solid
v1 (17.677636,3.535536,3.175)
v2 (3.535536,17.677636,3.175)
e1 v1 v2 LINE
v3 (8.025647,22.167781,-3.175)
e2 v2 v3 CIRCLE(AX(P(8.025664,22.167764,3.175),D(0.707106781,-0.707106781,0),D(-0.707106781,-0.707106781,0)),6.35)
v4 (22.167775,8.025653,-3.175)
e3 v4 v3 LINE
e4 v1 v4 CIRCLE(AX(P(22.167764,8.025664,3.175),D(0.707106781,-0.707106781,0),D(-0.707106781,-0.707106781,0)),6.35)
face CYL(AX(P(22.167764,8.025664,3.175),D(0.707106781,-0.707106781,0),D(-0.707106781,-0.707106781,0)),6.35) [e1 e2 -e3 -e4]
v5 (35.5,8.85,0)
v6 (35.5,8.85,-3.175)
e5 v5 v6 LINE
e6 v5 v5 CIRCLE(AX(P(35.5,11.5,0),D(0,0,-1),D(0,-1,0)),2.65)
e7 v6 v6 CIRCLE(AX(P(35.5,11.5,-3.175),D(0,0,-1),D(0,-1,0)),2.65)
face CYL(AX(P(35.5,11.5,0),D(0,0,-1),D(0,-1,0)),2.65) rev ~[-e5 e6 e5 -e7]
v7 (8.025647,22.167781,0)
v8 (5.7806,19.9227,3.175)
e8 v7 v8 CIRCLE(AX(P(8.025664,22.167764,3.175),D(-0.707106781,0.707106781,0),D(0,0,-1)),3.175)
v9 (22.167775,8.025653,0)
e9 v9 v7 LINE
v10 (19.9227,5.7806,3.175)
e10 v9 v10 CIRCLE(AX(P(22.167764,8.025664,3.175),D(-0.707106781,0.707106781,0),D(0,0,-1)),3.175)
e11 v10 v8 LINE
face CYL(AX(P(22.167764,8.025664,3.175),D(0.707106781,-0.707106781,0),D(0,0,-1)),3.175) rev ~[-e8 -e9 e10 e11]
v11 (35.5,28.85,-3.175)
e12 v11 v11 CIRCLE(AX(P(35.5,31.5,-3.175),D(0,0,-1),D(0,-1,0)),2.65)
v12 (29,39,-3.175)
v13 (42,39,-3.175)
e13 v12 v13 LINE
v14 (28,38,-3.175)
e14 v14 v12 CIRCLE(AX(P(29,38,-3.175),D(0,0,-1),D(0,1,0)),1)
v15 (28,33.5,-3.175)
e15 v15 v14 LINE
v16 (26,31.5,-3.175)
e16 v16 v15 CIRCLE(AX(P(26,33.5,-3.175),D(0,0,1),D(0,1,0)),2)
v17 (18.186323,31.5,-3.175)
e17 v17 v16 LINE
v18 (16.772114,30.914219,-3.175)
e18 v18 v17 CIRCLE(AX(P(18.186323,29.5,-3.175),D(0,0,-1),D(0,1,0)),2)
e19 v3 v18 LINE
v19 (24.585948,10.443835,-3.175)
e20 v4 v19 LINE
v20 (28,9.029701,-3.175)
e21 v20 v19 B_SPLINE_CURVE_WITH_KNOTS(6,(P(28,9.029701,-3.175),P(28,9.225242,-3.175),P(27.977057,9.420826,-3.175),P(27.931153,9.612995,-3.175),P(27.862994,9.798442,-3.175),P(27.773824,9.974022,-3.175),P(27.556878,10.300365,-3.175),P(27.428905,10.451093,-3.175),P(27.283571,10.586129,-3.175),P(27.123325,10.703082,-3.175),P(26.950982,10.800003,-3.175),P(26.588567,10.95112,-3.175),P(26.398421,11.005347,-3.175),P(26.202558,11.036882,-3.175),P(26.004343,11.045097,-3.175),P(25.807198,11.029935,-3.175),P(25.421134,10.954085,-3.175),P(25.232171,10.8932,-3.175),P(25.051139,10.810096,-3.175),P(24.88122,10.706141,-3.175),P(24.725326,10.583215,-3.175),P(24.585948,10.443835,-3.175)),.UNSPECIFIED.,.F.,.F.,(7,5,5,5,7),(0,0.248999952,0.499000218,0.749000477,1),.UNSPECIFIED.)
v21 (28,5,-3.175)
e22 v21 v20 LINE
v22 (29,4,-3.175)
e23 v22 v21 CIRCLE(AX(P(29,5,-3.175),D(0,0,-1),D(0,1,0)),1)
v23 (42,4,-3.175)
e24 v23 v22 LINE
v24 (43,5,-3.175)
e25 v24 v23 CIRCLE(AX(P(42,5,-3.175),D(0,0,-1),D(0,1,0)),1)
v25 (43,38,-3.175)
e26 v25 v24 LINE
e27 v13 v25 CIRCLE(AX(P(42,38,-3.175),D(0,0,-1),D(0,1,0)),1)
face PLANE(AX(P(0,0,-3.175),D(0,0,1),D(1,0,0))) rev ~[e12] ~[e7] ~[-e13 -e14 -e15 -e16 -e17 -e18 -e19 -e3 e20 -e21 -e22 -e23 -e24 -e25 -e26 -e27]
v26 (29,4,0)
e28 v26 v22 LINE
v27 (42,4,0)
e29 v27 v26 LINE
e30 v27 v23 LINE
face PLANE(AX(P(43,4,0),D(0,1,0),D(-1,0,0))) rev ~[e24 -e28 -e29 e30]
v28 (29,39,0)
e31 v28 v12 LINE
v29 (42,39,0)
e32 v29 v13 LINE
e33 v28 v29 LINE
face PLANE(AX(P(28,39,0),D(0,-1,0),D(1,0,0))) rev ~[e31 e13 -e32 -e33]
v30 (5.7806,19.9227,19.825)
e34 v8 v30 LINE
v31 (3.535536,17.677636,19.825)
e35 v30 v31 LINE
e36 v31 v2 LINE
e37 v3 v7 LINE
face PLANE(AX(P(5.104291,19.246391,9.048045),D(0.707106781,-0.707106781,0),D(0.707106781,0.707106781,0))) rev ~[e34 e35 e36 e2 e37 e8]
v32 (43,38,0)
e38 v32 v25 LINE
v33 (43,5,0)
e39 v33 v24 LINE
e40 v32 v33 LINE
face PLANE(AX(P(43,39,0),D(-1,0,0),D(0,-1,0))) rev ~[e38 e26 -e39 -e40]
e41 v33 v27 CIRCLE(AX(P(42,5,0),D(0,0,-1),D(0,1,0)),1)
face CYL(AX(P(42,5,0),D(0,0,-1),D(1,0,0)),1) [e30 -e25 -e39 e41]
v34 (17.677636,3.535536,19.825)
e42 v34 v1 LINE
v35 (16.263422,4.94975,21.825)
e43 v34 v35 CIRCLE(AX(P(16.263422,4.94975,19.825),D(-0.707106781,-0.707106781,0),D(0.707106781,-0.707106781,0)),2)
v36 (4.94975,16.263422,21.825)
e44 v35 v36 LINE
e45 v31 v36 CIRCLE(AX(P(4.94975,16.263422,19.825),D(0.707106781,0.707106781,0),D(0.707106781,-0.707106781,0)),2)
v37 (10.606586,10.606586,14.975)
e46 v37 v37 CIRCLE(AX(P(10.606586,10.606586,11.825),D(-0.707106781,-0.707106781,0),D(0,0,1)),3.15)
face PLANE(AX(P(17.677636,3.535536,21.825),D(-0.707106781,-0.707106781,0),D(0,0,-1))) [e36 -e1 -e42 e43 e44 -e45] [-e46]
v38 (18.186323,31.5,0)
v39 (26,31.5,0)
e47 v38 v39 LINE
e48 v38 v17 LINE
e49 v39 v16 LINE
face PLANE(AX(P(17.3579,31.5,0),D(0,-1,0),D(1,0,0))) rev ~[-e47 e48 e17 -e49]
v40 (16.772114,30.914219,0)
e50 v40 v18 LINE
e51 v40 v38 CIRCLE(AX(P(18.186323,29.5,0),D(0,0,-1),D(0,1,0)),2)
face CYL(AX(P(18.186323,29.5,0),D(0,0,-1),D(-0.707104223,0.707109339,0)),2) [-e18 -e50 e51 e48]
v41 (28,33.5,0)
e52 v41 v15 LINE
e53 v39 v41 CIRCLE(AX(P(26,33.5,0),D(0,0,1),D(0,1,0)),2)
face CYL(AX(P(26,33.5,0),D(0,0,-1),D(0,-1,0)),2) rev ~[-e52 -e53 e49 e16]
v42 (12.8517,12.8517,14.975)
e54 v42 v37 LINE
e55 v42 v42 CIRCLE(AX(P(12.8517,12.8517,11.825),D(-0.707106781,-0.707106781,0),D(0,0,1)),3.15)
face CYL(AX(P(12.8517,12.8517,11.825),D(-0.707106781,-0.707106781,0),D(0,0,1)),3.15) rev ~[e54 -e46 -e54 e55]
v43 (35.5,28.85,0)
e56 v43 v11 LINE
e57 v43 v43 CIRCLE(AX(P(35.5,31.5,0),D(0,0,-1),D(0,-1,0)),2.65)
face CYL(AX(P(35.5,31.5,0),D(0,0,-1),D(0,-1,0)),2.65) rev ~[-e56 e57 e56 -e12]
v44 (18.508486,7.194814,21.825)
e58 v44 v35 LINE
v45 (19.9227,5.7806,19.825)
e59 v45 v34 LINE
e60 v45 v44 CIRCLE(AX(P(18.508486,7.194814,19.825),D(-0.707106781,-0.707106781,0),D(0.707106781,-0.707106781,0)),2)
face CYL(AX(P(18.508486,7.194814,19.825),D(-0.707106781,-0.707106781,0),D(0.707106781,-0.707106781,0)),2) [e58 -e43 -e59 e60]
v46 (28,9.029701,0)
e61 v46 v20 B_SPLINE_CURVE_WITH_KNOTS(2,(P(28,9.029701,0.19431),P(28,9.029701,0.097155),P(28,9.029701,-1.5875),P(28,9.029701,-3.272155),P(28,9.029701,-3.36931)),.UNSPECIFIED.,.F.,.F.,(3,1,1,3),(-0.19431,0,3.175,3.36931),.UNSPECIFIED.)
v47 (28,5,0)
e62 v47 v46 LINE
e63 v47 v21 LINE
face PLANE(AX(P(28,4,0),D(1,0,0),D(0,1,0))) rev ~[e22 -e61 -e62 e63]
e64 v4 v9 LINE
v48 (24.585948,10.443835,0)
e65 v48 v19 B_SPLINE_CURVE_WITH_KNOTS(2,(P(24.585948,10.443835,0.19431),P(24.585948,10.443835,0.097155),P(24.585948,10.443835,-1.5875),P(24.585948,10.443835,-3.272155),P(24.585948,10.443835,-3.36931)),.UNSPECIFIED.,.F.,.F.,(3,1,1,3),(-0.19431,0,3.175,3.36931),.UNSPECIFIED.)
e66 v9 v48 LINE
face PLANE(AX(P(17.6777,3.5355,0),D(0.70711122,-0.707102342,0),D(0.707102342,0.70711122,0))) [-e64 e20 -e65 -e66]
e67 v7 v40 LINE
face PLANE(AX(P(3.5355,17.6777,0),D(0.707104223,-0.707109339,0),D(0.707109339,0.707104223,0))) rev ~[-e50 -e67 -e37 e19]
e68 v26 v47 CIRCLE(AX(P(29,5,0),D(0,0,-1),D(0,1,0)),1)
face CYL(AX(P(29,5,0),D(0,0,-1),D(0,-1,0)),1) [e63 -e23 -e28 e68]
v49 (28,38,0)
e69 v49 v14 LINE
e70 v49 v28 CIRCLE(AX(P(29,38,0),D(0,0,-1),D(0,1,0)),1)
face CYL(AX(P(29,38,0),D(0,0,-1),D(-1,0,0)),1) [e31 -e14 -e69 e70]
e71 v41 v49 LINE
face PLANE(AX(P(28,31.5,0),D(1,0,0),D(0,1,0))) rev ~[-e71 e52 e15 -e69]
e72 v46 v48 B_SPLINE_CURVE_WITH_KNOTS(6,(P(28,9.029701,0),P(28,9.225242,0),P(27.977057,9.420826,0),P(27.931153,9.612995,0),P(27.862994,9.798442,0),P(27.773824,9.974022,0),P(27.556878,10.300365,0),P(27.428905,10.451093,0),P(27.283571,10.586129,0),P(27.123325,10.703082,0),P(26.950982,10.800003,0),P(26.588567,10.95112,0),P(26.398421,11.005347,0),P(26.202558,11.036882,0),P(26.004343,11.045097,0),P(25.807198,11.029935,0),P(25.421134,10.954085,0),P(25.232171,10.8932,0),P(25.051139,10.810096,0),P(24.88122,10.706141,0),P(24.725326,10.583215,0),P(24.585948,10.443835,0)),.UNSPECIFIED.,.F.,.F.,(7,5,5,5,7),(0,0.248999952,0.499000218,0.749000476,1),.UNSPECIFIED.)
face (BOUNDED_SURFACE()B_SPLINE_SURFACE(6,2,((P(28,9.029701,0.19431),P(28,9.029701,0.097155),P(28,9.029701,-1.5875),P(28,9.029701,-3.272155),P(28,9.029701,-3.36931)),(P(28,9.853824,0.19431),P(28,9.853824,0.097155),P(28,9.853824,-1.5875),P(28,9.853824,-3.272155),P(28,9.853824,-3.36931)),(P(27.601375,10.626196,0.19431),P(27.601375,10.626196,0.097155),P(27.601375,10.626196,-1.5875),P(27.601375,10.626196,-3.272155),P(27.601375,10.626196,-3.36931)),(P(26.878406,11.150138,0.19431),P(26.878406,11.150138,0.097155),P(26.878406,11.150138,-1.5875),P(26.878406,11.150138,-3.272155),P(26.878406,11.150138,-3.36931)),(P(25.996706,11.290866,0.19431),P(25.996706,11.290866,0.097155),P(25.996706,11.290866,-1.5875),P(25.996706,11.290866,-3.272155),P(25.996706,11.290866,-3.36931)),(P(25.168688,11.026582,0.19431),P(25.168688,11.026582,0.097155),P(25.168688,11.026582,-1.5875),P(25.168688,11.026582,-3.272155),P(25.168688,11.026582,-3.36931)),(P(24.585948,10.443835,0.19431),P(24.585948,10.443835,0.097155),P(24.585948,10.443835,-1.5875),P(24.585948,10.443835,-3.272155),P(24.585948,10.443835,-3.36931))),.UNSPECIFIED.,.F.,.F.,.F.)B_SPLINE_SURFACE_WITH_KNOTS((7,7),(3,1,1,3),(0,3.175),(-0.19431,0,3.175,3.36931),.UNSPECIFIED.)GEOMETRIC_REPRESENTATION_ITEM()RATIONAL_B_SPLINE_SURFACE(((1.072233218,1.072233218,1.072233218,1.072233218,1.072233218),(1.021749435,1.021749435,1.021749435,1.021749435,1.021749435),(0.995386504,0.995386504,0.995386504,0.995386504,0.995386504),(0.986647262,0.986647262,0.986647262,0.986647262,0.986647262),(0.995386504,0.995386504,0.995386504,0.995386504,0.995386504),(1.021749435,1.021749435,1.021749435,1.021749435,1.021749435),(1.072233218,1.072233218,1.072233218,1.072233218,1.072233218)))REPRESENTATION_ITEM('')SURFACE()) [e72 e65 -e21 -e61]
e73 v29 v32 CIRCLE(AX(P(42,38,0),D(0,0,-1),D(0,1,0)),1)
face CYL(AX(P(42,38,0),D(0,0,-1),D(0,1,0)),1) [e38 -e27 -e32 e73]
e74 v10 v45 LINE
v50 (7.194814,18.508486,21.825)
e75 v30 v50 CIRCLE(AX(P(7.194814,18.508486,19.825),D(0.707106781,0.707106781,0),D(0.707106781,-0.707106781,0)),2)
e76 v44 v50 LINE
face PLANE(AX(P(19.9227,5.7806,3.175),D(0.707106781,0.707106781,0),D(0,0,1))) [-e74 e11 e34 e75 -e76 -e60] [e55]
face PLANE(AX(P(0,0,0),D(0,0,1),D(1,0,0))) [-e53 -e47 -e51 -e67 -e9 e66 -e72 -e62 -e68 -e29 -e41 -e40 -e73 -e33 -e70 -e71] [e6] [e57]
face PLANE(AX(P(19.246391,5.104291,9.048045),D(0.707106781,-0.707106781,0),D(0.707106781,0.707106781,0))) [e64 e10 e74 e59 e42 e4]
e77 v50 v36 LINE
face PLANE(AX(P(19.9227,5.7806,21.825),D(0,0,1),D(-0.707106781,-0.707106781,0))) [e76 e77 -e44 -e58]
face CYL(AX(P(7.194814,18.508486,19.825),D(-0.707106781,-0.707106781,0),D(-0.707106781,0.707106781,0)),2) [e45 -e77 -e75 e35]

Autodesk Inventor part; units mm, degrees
ref_plane "YZ Plane" through (0, 0, 0) normal (1, 0, 0) x (0, 1, 0)
ref_plane "XZ Plane" through (0, 0, 0) normal (0, 1, 0) x (-1, 0, 0)
ref_plane "XY Plane" through (0, 0, 0) normal (0, 0, 1) x (1, 0, 0)
sketch "Sketch1" plane through (0, 0, 0) normal (0, 0, 1) x (1, 0, 0)
  line L0 (0, -21.2132) -> (-21.2132, 0) construction
  line L1 (-21.2132, 0) -> (0, 21.2132) construction
  line L2 (0, 21.2132) -> (21.2132, 0) construction
  line L3 (21.2132, 0) -> (0, -21.2132) construction
  line L4 (0, -21.2132) -> (0, 21.2132) construction
  line L5 (-21.2132, 0) -> (21.2132, 0) construction
  line L6 (43, 4) -> (28, 4)
  line L7 (28, 4) -> (28, 39)
  line L8 (28, 39) -> (43, 39)
  line L9 (43, 39) -> (43, 4)
  line L10 (43, 4) -> (28, 39) construction
  line L11 (28, 4) -> (43, 39) construction
  line L12 (35.5, 11.5) -> (35.5, 31.5) construction
  line L13 (17.6777, 3.5355) -> (3.5355, 17.6777)
  line L14 (3.5355, 17.6777) -> (17.3579, 31.5)
  line L15 (17.3579, 31.5) -> (28, 31.5)
  line L16 (17.6777, 3.5355) -> (25.6421, 11.5)
  line L17 (25.6421, 11.5) -> (28, 11.5)
  line L18 (28, 11.5) -> (28, 31.5)
  point P0 (0, 0)
  point P1 (35.5, 21.5)
  point P2 (0, 0)
  point P3 (0, 0)
  point P4 (35.5, 21.5)
  point P5 (43, 21.5)
  point P6 (10.6066, 10.6066)
  point P7 (28, 21.5)
  dimension "d0" = 30
  dimension "d1" = 28
  dimension "d2" = 21.5
  dimension "d3" = 35
  dimension "d5" = 20
  dimension "d6" = 7.5
  dimension "d7" = 7.5
  dimension "d8" = 7.5
  dimension "d11" = 20
  dimension "d12" = 20
extrude "Plate2" add sketch "Sketch1" against normal blind 3.175
sketch "Sketch2" plane through (5.7806, 19.9227, -3.175) normal (-0.7071068, -0.7071068, 0) x (0.7071068, -0.7071068, 0)
  line L0 (20, 0) -> (0, 0)
  line L1 (0, 0) -> (0, -25)
  line L2 (0, -25) -> (20, -25)
  line L3 (20, -25) -> (20, 0)
edge flange "Flange1" height 25 angle 90 thickness 3.175 bend radius 3.175 thickness toward (-0.7071068, -0.7071068, 0) relief tear relief width 3.175 relief depth 1.5875 edges at (10.6066, 10.6066, -3.175) wall of the first edge with corners at (19.9227, 5.7806, -3.175) (5.7806, 19.9227, -3.175) (5.7806, 19.9227, 21.825) (19.9227, 5.7806, 21.825)
bend "Bend1"
corner "Corner1"
fillet "Fillet1" radius 2 4 edges at (25.6421, 11.5, -1.5875) (28, 11.5, -1.5875) (28, 31.5, -1.5875) (17.3579, 31.5, -1.5875)
sketch "Sketch3" plane through (5.7806, 19.9227, 3.175) normal (0.7071068, 0.7071068, 0) x (-0.7071068, 0.7071068, 0)
  line L0 (0, -1.35) -> (-20, -1.35) construction
  line L1 (-20, -1.35) -> (-20, 18.65) construction
  line L2 (-20, 18.65) -> (0, 18.65) construction
  line L3 (0, 18.65) -> (0, -1.35) construction
  line L4 (0, -1.35) -> (-20, 18.65) construction
  line L5 (-20, -1.35) -> (0, 18.65) construction
  point P0 (-10, -3.175)
  point P1 (-10, 8.65)
  point P2 (-20, 18.65)
  point P3 (0, 18.65)
hole "Hole2" at (12.8517, 12.8517, 11.825) direction (-0.7071068, -0.7071068, 0) diameter 6.3 end through all
fillet "Fillet2" radius 2 2 edges at (4.6581, 18.8002, 21.825) (18.8002, 4.6581, 21.825)
fillet "Fillet3" radius 1 4 edges at (28, 4, -1.5875) (28, 39, -1.5875) (43, 4, -1.5875) (43, 39, -1.5875)
hole "Hole1" at (35.5, 31.5, 0) at (35.5, 11.5, 0) direction (0, 0, -1) diameter 5.3 end through all
equation "\"d6\" = d7"
equation "\"d8\" = d6"
equation "\"d12\" = d11"
equation "\"d32\" = Thickness"
equation "\"d13\" = Thickness"
equation "\"d14\" = BendReliefWidth"
equation "\"d15\" = BendReliefDepth"
equation "\"d16\" = MinimumRemnant"
equation "\"d17\" = TransitionRadius"
equation "\"d20\" = BendRadius"
equation "\"d21\" = CornerReliefSize"
equation "\"d22\" = GapSize"
equation "\"d23\" = JacobiRadiusSize"
equation "\"BendReliefWidth\" = Thickness"
equation "\"BendReliefDepth\" = 0.5 * Thickness"
equation "\"CornerReliefSize\" = 4 * Thickness"
equation "\"MinimumRemnant\" = 2 * Thickness"
equation "\"TransitionRadius\" = BendRadius"
equation "\"JacobiRadiusSize\" = BendRadius"
equation "\"GapSize\" = Thickness"
equation "\"Thickness\" = 3.175"
equation "\"BendRadius\" = 3.175"
properties part number "External Frame Corner Bracket Mirror" material "Aluminum 6061"
